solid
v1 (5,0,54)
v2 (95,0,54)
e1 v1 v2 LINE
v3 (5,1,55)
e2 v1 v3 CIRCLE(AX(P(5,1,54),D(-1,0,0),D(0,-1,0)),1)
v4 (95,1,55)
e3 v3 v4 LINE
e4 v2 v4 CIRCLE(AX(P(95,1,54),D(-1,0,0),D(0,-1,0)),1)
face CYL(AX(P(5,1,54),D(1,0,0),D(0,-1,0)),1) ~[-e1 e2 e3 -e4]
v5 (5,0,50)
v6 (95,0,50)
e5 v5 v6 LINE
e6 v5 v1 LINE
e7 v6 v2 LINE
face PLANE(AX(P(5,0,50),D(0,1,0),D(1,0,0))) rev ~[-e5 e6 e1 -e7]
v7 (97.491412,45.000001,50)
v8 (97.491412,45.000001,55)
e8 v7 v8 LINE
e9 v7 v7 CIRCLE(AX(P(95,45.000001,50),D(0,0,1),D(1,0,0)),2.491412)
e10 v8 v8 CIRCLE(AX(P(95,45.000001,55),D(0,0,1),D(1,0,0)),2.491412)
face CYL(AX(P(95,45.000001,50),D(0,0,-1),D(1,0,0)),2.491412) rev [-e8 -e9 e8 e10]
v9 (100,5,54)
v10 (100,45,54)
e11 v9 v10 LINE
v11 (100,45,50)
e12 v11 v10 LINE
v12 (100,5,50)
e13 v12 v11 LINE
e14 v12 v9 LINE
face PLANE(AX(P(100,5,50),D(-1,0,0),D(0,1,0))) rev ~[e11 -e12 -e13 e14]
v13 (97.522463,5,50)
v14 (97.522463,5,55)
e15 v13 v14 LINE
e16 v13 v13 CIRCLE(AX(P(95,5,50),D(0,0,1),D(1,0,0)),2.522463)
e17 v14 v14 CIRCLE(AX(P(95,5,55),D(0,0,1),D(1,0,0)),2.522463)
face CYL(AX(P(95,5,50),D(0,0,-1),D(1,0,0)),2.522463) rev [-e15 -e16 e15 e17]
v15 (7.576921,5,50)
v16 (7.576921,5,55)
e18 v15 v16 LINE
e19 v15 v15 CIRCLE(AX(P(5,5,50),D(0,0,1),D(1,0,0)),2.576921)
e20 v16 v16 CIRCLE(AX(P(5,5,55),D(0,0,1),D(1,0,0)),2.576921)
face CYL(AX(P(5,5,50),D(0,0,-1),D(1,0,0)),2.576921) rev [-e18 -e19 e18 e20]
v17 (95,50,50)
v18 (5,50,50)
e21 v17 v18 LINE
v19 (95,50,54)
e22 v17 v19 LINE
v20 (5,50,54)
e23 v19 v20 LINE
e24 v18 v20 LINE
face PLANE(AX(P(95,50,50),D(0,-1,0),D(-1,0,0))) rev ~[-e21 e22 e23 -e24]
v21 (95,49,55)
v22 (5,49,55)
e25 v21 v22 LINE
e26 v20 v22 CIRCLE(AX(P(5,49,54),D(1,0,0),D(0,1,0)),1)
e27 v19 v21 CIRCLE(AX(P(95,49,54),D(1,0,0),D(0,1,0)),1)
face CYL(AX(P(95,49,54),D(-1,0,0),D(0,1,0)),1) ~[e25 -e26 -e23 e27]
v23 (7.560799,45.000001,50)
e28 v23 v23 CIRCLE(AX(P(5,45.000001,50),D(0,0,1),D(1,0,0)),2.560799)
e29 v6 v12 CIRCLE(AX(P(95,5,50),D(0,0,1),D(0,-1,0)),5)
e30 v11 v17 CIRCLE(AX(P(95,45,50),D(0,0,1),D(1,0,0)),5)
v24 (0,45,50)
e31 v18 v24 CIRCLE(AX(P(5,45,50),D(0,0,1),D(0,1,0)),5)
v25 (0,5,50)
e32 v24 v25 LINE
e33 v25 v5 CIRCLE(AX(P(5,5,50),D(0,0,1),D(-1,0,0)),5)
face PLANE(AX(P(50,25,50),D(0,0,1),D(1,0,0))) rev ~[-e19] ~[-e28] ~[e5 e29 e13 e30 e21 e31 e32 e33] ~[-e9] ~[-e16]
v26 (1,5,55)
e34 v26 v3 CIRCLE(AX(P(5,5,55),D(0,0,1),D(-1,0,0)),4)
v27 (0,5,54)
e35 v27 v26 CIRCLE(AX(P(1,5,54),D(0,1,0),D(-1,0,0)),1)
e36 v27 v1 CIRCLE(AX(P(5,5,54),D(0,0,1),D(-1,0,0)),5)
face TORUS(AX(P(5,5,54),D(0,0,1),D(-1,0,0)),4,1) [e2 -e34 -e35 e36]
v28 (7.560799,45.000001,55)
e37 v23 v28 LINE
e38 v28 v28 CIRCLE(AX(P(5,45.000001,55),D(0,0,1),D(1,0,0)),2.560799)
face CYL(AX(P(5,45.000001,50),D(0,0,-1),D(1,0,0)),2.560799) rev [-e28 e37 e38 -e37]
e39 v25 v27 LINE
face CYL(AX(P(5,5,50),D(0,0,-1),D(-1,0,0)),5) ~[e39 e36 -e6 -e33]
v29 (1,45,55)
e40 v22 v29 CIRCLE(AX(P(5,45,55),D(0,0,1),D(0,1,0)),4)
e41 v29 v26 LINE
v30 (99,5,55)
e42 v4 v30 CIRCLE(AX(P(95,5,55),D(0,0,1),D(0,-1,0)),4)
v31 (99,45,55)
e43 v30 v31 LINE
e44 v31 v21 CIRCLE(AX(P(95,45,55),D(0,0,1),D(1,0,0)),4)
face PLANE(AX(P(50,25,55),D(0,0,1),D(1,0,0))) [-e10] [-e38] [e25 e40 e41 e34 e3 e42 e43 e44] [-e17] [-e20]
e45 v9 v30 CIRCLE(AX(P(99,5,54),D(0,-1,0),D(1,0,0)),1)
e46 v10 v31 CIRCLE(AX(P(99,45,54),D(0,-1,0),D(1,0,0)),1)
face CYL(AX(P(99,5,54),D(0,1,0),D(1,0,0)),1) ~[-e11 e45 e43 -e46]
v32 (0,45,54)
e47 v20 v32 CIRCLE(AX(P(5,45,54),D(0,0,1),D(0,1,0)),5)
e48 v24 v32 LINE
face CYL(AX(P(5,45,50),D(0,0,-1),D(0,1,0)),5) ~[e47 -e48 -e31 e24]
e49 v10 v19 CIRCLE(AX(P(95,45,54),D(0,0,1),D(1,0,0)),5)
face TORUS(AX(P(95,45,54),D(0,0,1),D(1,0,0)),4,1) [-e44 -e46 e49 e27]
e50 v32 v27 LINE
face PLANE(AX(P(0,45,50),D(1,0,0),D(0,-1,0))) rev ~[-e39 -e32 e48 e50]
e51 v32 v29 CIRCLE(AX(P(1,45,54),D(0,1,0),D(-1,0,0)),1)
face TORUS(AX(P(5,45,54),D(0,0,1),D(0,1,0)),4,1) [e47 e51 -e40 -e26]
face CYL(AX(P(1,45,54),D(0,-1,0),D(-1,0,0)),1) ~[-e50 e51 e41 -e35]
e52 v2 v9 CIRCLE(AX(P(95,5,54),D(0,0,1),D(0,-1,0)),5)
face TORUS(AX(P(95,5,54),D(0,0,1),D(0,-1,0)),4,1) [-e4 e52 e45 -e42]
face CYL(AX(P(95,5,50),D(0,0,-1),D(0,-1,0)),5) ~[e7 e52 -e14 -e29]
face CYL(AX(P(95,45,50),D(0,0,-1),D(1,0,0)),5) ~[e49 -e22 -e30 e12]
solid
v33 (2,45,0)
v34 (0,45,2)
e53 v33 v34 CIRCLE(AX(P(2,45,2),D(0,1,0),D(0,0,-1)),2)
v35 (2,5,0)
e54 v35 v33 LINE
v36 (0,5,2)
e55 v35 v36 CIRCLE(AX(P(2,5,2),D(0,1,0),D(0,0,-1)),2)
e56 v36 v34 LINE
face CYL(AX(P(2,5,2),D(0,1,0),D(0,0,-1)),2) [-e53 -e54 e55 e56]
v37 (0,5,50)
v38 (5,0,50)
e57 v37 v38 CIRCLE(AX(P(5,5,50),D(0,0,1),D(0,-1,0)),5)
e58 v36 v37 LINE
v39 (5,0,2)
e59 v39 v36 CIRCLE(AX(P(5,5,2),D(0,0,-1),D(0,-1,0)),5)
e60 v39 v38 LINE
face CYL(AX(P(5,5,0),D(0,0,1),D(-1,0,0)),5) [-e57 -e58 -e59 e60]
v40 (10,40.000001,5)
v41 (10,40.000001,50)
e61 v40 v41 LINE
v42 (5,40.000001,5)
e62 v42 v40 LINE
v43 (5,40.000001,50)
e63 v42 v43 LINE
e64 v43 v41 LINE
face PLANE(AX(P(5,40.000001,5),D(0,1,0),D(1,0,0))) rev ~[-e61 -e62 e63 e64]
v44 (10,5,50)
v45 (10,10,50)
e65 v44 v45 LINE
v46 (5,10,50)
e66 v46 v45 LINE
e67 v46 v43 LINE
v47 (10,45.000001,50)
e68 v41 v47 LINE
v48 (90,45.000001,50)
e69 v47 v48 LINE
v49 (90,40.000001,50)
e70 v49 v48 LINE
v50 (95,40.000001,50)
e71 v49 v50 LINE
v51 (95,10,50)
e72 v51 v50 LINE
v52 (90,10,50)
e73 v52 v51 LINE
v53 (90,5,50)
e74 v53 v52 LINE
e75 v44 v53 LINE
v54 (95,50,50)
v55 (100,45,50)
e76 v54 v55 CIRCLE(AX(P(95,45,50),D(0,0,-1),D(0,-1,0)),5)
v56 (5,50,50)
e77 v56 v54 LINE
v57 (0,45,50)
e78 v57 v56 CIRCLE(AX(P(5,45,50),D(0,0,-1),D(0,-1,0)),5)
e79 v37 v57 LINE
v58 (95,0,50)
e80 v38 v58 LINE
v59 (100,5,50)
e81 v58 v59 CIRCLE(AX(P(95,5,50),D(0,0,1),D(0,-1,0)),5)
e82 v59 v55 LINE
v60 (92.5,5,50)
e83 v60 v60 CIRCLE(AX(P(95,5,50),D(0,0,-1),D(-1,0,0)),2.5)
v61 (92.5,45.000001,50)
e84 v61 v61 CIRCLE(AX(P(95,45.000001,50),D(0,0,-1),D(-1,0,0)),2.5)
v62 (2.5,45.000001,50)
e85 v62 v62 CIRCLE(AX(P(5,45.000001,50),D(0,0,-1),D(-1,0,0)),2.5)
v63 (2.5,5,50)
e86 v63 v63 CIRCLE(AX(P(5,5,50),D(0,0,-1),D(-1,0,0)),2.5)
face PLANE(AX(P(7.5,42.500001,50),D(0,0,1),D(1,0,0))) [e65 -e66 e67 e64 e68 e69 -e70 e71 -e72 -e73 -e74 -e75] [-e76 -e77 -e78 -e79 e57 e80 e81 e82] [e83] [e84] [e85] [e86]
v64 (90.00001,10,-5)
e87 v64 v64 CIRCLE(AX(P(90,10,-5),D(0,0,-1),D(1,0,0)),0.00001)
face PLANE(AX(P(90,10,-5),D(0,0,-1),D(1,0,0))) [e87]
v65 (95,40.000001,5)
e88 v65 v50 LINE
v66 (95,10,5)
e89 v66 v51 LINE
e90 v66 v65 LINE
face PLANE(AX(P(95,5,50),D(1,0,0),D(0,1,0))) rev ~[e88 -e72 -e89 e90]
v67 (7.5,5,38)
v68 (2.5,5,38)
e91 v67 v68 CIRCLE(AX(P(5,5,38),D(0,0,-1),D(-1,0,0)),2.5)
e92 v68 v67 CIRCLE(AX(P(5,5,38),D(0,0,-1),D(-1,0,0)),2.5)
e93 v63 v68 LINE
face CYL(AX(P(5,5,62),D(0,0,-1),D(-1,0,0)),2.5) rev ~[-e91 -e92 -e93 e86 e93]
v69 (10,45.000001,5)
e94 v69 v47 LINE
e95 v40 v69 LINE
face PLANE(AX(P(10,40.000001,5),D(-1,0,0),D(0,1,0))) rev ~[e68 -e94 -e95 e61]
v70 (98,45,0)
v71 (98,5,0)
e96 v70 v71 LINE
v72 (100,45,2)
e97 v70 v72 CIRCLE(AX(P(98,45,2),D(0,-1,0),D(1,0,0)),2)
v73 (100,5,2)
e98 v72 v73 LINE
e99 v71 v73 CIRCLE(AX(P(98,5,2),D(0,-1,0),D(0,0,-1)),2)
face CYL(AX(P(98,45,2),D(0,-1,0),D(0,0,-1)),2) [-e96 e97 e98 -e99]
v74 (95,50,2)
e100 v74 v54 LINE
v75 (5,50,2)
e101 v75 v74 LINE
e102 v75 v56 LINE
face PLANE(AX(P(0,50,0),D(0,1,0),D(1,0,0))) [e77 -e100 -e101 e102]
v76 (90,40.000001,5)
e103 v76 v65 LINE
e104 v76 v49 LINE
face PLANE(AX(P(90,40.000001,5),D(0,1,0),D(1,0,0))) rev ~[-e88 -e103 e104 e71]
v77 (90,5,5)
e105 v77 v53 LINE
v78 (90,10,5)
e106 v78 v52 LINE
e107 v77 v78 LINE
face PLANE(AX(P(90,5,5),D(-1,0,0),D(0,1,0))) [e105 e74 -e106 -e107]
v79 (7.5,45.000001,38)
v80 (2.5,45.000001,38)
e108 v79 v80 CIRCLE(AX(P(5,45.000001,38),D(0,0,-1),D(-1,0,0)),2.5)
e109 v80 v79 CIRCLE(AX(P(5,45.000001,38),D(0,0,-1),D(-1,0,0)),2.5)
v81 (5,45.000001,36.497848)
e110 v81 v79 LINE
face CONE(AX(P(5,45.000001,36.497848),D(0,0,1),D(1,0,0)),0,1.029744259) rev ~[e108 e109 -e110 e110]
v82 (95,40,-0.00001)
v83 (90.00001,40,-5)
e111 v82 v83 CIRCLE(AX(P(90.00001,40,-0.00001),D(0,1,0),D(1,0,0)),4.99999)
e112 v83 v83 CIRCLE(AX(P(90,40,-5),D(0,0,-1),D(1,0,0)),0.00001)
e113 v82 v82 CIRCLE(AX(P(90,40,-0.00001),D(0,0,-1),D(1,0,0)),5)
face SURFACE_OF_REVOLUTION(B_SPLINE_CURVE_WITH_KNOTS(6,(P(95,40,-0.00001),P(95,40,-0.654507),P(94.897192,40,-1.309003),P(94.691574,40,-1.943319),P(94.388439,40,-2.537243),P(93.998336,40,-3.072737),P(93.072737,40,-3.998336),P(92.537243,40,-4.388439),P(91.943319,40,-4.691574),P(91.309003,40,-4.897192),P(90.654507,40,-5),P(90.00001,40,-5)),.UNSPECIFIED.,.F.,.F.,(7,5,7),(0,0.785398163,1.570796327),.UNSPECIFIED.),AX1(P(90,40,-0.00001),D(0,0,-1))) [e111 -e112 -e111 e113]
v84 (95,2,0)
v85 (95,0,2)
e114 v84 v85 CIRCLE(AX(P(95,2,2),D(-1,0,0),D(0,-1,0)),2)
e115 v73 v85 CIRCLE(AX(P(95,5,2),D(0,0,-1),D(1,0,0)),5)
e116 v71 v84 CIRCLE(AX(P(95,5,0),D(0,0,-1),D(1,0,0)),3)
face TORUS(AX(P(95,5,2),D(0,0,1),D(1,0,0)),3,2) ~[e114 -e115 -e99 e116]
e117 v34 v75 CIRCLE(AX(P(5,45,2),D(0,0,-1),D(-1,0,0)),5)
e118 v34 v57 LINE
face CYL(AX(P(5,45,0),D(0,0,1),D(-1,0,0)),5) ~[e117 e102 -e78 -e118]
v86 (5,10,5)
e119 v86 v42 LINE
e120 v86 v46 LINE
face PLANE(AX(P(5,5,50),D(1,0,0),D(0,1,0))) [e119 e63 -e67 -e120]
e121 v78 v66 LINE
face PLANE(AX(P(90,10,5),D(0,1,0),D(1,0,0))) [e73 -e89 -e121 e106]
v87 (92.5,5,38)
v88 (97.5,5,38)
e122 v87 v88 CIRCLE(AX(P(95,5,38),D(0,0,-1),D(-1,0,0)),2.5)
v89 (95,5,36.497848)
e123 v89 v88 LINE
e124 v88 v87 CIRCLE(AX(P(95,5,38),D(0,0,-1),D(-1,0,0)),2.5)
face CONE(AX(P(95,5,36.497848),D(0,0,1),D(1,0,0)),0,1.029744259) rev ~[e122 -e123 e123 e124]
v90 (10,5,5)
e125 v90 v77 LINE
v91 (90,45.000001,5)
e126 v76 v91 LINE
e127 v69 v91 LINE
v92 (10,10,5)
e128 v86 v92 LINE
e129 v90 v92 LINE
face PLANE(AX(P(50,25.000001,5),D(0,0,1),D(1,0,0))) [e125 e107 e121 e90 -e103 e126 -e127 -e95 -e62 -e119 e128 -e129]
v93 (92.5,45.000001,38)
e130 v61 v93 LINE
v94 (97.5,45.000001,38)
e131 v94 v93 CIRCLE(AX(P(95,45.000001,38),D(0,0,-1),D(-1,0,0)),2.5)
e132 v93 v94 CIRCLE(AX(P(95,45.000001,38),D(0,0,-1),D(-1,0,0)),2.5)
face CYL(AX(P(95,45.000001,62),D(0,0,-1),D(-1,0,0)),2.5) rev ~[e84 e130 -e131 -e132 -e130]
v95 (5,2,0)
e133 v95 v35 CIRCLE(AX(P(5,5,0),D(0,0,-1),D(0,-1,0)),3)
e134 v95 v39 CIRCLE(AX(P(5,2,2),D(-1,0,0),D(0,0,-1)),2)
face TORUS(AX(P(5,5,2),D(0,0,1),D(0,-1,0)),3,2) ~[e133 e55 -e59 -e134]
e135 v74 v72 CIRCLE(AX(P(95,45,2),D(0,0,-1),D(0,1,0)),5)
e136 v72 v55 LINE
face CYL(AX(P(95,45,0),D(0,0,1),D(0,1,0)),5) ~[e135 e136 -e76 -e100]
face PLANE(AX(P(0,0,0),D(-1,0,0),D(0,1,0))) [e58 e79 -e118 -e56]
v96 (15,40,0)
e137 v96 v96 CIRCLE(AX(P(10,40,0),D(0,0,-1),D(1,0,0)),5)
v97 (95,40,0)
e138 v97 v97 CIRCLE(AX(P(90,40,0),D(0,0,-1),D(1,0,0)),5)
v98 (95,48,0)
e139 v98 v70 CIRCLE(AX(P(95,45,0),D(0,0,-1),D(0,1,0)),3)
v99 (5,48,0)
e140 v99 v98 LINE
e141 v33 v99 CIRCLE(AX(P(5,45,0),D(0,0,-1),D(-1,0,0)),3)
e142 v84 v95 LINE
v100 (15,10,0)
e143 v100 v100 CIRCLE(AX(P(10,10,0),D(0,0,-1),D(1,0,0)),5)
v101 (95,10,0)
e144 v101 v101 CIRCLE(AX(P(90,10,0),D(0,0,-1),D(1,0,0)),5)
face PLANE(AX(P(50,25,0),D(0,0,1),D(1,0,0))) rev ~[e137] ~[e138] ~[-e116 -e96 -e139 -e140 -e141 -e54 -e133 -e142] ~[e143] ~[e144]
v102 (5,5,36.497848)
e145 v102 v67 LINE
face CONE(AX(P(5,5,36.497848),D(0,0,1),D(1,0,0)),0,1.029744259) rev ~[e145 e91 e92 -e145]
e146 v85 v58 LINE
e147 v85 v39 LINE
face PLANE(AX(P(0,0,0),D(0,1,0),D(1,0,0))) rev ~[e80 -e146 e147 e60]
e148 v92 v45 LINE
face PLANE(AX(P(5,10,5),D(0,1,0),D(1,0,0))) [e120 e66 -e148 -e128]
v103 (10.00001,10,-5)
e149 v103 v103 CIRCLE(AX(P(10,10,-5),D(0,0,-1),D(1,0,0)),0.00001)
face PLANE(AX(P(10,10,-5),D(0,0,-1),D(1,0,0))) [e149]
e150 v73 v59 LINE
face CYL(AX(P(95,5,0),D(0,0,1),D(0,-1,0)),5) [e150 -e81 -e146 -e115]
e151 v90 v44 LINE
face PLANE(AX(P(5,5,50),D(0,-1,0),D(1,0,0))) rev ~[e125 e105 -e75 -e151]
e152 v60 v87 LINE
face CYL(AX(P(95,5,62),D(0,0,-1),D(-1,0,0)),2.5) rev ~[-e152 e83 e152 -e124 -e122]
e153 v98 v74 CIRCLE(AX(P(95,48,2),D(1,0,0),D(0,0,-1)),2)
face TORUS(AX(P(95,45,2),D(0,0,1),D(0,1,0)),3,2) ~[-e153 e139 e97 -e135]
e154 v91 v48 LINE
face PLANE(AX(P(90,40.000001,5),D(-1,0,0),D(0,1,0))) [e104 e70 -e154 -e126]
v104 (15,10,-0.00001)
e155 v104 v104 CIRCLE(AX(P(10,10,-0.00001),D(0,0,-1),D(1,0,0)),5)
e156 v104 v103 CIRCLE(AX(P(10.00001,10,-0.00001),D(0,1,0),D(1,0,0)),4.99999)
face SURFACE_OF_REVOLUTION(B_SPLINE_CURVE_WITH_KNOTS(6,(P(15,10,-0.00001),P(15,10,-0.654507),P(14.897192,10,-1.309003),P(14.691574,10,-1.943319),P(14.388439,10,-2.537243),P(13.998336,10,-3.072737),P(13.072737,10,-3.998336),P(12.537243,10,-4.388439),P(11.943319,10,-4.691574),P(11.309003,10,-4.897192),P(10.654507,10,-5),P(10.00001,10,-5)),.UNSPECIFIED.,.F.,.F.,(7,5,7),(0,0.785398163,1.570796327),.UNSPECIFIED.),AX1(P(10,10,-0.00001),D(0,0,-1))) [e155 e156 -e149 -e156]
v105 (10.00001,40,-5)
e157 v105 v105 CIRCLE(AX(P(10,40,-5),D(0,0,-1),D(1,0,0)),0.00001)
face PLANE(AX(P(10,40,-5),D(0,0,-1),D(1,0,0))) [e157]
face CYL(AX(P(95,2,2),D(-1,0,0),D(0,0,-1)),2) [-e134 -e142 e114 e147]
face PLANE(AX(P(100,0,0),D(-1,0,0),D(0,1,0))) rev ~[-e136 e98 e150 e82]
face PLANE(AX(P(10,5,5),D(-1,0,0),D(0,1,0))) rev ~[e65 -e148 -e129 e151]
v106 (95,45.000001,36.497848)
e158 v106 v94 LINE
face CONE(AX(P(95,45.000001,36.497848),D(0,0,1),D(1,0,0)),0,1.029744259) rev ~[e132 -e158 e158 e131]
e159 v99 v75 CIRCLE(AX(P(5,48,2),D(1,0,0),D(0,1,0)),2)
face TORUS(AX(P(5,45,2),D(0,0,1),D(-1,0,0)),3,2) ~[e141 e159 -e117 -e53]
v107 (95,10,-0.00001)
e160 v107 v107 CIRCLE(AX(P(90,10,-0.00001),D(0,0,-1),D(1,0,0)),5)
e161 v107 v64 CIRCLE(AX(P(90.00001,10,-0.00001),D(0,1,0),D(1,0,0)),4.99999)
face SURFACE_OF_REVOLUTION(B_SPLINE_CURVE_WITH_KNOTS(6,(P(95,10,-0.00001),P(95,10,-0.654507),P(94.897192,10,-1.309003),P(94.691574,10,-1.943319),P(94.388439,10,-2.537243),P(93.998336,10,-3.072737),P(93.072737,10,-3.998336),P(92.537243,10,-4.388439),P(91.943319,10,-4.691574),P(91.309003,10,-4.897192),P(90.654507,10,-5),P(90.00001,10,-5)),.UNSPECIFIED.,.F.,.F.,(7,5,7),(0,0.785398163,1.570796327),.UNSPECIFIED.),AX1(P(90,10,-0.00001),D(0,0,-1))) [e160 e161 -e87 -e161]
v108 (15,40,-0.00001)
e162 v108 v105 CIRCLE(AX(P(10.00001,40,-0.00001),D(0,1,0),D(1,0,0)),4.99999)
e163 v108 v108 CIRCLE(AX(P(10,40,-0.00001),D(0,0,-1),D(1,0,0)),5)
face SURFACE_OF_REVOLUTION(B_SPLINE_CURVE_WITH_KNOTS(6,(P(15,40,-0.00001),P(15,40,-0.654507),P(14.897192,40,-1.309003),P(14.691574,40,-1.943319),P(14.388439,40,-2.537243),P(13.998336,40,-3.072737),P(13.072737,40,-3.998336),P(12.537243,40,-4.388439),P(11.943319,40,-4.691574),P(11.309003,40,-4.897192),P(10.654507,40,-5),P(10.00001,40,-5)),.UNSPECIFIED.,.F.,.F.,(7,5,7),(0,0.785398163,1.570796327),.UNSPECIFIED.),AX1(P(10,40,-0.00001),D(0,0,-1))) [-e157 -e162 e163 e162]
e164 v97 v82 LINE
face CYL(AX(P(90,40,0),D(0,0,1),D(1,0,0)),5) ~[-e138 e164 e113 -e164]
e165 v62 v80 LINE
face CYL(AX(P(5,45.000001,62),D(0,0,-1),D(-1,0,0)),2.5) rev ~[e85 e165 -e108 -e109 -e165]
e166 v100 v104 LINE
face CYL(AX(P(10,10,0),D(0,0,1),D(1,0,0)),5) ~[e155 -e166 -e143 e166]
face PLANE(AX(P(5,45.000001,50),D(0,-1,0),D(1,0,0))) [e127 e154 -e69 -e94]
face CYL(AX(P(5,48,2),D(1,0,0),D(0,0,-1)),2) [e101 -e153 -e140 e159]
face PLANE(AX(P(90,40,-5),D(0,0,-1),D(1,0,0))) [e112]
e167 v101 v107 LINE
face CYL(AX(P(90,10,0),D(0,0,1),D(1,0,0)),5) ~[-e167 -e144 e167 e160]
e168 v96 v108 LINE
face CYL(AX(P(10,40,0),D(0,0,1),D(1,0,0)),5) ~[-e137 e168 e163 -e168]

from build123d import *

# Parameters (mm, degrees)
F0_W      = 100
F0_H      = 50
F1_DEPTH  = 50
F2_W      = 90
F2_H      = 40.0000010431
F3_DEPTH  = 45
F4_W      = 5
F4_H      = 5
F5_DEPTH  = 45
F7_D      = 5
F7_DEPTH  = 12
F7_TIP    = 1.5021515476
F8_R      = 5
F9_R      = 2.5769210798
F9_R_2    = 2.5224628813
F9_R_3    = 2.5607989108
F9_R_4    = 2.4914116102
F10_DEPTH = 5
F11_R     = 5
F12_DEPTH = 5
F13_R     = 4.99999
F14_R     = 2
F15_R     = 1


# Not quite as in the source:
# - a fillet or chamfer is up to 0.001 mm smaller than in the source, because OpenCascade refuses the exact size


with BuildPart() as f1:
    # F0 (on Top) → F1 (new body)
    with BuildSketch(Plane.XY):
        with Locations((50, 25)):
            Rectangle(F0_W, F0_H)
    extrude(amount=F1_DEPTH)

    # F2 (on face) → F3 (cut)
    with BuildSketch(Plane.XY.offset(50)):
        with Locations((50, 25.0000005215)):
            Rectangle(F2_W, F2_H)
    extrude(amount=-F3_DEPTH, mode=Mode.SUBTRACT)

    # F4 (on face) → F5 (join)
    with BuildSketch(Plane.XY.offset(5)):
        with Locations((7.5, 42.5000010431)):
            Rectangle(F4_W, F4_H)
        with Locations((7.5, 7.5)):
            Rectangle(F4_W, F4_H)
        with Locations((92.5, 42.5000010431)):
            Rectangle(F4_W, F4_H)
        with Locations((92.5, 7.5)):
            Rectangle(F4_W, F4_H)
    extrude(amount=F5_DEPTH)

    # F7
    with Locations(Plane.XY.offset(50)):
        with Locations((5, 45.0000010431), (5, 5), (95, 5), (95, 45.0000010431)):
            Hole(F7_D / 2, depth=F7_DEPTH)
            with Locations((0, 0, -(F7_DEPTH + F7_TIP / 2))):  # 118° drill point
                Cone(0, F7_D / 2, F7_TIP, mode=Mode.SUBTRACT)

    # F8
    f8_edges = [f1.edges().sort_by_distance(p)[0] for p in [
        (0, 0, 25),
        (0, 50, 25),
        (100, 50, 25),
        (100, 0, 25),
    ]]
    fillet(f8_edges, radius=F8_R)

    # F11 (on face) → F12 (join)
    with BuildSketch(Plane(origin=(0, 0, 0), x_dir=(1, 0, 0), z_dir=(0, 0, -1))):
        with Locations((10, -10)):
            Circle(F11_R)
        with Locations((90, -10)):
            Circle(F11_R)
        with Locations((90, -40)):
            Circle(F11_R)
        with Locations((10, -40)):
            Circle(F11_R)
    extrude(amount=F12_DEPTH)

    # F13 (radius 5 in the source; OpenCascade refuses exactly that, so slightly less here)
    f13_edges = [f1.edges().sort_by_distance(p)[0] for p in [
        (5, 10, -5),
        (5, 40, -5),
        (85, 10, -5),
        (85, 40, -5),
    ]]
    fillet(f13_edges, radius=F13_R)

    # F14
    f14_edges = [f1.edges().sort_by_distance(p)[0] for p in [
        (0, 25, 0),
    ]]
    fillet(f14_edges, radius=F14_R)


with BuildPart() as f10:
    # F9 (on face) → F10 (new body)
    with BuildSketch(Plane.XY.offset(50)):
        with BuildLine():
            Line((95, 50), (5, 50))
            ThreePointArc((5, 50), (1.4644660941, 48.5355339059), (0, 45))
            Line((0, 45), (0, 5))
            ThreePointArc((0, 5), (1.4644660941, 1.4644660941), (5, 0))
            Line((5, 0), (95, 0))
            ThreePointArc((95, 0), (98.5355339059, 1.4644660941), (100, 5))
            Line((100, 5), (100, 45))
            ThreePointArc((100, 45), (98.5355339059, 48.5355339059), (95, 50))
        make_face()
        with Locations((5, 5)):
            Circle(F9_R, mode=Mode.SUBTRACT)
        with Locations((95, 5)):
            Circle(F9_R_2, mode=Mode.SUBTRACT)
        with Locations((5, 45.0000010431)):
            Circle(F9_R_3, mode=Mode.SUBTRACT)
        with Locations((95, 45.0000010431)):
            Circle(F9_R_4, mode=Mode.SUBTRACT)
    extrude(amount=F10_DEPTH)

    # F15
    f15_edges = [f10.edges().sort_by_distance(p)[0] for p in [
        (50, 50, 55),
    ]]
    fillet(f15_edges, radius=F15_R)


solid = Compound([f1.part, f10.part])
